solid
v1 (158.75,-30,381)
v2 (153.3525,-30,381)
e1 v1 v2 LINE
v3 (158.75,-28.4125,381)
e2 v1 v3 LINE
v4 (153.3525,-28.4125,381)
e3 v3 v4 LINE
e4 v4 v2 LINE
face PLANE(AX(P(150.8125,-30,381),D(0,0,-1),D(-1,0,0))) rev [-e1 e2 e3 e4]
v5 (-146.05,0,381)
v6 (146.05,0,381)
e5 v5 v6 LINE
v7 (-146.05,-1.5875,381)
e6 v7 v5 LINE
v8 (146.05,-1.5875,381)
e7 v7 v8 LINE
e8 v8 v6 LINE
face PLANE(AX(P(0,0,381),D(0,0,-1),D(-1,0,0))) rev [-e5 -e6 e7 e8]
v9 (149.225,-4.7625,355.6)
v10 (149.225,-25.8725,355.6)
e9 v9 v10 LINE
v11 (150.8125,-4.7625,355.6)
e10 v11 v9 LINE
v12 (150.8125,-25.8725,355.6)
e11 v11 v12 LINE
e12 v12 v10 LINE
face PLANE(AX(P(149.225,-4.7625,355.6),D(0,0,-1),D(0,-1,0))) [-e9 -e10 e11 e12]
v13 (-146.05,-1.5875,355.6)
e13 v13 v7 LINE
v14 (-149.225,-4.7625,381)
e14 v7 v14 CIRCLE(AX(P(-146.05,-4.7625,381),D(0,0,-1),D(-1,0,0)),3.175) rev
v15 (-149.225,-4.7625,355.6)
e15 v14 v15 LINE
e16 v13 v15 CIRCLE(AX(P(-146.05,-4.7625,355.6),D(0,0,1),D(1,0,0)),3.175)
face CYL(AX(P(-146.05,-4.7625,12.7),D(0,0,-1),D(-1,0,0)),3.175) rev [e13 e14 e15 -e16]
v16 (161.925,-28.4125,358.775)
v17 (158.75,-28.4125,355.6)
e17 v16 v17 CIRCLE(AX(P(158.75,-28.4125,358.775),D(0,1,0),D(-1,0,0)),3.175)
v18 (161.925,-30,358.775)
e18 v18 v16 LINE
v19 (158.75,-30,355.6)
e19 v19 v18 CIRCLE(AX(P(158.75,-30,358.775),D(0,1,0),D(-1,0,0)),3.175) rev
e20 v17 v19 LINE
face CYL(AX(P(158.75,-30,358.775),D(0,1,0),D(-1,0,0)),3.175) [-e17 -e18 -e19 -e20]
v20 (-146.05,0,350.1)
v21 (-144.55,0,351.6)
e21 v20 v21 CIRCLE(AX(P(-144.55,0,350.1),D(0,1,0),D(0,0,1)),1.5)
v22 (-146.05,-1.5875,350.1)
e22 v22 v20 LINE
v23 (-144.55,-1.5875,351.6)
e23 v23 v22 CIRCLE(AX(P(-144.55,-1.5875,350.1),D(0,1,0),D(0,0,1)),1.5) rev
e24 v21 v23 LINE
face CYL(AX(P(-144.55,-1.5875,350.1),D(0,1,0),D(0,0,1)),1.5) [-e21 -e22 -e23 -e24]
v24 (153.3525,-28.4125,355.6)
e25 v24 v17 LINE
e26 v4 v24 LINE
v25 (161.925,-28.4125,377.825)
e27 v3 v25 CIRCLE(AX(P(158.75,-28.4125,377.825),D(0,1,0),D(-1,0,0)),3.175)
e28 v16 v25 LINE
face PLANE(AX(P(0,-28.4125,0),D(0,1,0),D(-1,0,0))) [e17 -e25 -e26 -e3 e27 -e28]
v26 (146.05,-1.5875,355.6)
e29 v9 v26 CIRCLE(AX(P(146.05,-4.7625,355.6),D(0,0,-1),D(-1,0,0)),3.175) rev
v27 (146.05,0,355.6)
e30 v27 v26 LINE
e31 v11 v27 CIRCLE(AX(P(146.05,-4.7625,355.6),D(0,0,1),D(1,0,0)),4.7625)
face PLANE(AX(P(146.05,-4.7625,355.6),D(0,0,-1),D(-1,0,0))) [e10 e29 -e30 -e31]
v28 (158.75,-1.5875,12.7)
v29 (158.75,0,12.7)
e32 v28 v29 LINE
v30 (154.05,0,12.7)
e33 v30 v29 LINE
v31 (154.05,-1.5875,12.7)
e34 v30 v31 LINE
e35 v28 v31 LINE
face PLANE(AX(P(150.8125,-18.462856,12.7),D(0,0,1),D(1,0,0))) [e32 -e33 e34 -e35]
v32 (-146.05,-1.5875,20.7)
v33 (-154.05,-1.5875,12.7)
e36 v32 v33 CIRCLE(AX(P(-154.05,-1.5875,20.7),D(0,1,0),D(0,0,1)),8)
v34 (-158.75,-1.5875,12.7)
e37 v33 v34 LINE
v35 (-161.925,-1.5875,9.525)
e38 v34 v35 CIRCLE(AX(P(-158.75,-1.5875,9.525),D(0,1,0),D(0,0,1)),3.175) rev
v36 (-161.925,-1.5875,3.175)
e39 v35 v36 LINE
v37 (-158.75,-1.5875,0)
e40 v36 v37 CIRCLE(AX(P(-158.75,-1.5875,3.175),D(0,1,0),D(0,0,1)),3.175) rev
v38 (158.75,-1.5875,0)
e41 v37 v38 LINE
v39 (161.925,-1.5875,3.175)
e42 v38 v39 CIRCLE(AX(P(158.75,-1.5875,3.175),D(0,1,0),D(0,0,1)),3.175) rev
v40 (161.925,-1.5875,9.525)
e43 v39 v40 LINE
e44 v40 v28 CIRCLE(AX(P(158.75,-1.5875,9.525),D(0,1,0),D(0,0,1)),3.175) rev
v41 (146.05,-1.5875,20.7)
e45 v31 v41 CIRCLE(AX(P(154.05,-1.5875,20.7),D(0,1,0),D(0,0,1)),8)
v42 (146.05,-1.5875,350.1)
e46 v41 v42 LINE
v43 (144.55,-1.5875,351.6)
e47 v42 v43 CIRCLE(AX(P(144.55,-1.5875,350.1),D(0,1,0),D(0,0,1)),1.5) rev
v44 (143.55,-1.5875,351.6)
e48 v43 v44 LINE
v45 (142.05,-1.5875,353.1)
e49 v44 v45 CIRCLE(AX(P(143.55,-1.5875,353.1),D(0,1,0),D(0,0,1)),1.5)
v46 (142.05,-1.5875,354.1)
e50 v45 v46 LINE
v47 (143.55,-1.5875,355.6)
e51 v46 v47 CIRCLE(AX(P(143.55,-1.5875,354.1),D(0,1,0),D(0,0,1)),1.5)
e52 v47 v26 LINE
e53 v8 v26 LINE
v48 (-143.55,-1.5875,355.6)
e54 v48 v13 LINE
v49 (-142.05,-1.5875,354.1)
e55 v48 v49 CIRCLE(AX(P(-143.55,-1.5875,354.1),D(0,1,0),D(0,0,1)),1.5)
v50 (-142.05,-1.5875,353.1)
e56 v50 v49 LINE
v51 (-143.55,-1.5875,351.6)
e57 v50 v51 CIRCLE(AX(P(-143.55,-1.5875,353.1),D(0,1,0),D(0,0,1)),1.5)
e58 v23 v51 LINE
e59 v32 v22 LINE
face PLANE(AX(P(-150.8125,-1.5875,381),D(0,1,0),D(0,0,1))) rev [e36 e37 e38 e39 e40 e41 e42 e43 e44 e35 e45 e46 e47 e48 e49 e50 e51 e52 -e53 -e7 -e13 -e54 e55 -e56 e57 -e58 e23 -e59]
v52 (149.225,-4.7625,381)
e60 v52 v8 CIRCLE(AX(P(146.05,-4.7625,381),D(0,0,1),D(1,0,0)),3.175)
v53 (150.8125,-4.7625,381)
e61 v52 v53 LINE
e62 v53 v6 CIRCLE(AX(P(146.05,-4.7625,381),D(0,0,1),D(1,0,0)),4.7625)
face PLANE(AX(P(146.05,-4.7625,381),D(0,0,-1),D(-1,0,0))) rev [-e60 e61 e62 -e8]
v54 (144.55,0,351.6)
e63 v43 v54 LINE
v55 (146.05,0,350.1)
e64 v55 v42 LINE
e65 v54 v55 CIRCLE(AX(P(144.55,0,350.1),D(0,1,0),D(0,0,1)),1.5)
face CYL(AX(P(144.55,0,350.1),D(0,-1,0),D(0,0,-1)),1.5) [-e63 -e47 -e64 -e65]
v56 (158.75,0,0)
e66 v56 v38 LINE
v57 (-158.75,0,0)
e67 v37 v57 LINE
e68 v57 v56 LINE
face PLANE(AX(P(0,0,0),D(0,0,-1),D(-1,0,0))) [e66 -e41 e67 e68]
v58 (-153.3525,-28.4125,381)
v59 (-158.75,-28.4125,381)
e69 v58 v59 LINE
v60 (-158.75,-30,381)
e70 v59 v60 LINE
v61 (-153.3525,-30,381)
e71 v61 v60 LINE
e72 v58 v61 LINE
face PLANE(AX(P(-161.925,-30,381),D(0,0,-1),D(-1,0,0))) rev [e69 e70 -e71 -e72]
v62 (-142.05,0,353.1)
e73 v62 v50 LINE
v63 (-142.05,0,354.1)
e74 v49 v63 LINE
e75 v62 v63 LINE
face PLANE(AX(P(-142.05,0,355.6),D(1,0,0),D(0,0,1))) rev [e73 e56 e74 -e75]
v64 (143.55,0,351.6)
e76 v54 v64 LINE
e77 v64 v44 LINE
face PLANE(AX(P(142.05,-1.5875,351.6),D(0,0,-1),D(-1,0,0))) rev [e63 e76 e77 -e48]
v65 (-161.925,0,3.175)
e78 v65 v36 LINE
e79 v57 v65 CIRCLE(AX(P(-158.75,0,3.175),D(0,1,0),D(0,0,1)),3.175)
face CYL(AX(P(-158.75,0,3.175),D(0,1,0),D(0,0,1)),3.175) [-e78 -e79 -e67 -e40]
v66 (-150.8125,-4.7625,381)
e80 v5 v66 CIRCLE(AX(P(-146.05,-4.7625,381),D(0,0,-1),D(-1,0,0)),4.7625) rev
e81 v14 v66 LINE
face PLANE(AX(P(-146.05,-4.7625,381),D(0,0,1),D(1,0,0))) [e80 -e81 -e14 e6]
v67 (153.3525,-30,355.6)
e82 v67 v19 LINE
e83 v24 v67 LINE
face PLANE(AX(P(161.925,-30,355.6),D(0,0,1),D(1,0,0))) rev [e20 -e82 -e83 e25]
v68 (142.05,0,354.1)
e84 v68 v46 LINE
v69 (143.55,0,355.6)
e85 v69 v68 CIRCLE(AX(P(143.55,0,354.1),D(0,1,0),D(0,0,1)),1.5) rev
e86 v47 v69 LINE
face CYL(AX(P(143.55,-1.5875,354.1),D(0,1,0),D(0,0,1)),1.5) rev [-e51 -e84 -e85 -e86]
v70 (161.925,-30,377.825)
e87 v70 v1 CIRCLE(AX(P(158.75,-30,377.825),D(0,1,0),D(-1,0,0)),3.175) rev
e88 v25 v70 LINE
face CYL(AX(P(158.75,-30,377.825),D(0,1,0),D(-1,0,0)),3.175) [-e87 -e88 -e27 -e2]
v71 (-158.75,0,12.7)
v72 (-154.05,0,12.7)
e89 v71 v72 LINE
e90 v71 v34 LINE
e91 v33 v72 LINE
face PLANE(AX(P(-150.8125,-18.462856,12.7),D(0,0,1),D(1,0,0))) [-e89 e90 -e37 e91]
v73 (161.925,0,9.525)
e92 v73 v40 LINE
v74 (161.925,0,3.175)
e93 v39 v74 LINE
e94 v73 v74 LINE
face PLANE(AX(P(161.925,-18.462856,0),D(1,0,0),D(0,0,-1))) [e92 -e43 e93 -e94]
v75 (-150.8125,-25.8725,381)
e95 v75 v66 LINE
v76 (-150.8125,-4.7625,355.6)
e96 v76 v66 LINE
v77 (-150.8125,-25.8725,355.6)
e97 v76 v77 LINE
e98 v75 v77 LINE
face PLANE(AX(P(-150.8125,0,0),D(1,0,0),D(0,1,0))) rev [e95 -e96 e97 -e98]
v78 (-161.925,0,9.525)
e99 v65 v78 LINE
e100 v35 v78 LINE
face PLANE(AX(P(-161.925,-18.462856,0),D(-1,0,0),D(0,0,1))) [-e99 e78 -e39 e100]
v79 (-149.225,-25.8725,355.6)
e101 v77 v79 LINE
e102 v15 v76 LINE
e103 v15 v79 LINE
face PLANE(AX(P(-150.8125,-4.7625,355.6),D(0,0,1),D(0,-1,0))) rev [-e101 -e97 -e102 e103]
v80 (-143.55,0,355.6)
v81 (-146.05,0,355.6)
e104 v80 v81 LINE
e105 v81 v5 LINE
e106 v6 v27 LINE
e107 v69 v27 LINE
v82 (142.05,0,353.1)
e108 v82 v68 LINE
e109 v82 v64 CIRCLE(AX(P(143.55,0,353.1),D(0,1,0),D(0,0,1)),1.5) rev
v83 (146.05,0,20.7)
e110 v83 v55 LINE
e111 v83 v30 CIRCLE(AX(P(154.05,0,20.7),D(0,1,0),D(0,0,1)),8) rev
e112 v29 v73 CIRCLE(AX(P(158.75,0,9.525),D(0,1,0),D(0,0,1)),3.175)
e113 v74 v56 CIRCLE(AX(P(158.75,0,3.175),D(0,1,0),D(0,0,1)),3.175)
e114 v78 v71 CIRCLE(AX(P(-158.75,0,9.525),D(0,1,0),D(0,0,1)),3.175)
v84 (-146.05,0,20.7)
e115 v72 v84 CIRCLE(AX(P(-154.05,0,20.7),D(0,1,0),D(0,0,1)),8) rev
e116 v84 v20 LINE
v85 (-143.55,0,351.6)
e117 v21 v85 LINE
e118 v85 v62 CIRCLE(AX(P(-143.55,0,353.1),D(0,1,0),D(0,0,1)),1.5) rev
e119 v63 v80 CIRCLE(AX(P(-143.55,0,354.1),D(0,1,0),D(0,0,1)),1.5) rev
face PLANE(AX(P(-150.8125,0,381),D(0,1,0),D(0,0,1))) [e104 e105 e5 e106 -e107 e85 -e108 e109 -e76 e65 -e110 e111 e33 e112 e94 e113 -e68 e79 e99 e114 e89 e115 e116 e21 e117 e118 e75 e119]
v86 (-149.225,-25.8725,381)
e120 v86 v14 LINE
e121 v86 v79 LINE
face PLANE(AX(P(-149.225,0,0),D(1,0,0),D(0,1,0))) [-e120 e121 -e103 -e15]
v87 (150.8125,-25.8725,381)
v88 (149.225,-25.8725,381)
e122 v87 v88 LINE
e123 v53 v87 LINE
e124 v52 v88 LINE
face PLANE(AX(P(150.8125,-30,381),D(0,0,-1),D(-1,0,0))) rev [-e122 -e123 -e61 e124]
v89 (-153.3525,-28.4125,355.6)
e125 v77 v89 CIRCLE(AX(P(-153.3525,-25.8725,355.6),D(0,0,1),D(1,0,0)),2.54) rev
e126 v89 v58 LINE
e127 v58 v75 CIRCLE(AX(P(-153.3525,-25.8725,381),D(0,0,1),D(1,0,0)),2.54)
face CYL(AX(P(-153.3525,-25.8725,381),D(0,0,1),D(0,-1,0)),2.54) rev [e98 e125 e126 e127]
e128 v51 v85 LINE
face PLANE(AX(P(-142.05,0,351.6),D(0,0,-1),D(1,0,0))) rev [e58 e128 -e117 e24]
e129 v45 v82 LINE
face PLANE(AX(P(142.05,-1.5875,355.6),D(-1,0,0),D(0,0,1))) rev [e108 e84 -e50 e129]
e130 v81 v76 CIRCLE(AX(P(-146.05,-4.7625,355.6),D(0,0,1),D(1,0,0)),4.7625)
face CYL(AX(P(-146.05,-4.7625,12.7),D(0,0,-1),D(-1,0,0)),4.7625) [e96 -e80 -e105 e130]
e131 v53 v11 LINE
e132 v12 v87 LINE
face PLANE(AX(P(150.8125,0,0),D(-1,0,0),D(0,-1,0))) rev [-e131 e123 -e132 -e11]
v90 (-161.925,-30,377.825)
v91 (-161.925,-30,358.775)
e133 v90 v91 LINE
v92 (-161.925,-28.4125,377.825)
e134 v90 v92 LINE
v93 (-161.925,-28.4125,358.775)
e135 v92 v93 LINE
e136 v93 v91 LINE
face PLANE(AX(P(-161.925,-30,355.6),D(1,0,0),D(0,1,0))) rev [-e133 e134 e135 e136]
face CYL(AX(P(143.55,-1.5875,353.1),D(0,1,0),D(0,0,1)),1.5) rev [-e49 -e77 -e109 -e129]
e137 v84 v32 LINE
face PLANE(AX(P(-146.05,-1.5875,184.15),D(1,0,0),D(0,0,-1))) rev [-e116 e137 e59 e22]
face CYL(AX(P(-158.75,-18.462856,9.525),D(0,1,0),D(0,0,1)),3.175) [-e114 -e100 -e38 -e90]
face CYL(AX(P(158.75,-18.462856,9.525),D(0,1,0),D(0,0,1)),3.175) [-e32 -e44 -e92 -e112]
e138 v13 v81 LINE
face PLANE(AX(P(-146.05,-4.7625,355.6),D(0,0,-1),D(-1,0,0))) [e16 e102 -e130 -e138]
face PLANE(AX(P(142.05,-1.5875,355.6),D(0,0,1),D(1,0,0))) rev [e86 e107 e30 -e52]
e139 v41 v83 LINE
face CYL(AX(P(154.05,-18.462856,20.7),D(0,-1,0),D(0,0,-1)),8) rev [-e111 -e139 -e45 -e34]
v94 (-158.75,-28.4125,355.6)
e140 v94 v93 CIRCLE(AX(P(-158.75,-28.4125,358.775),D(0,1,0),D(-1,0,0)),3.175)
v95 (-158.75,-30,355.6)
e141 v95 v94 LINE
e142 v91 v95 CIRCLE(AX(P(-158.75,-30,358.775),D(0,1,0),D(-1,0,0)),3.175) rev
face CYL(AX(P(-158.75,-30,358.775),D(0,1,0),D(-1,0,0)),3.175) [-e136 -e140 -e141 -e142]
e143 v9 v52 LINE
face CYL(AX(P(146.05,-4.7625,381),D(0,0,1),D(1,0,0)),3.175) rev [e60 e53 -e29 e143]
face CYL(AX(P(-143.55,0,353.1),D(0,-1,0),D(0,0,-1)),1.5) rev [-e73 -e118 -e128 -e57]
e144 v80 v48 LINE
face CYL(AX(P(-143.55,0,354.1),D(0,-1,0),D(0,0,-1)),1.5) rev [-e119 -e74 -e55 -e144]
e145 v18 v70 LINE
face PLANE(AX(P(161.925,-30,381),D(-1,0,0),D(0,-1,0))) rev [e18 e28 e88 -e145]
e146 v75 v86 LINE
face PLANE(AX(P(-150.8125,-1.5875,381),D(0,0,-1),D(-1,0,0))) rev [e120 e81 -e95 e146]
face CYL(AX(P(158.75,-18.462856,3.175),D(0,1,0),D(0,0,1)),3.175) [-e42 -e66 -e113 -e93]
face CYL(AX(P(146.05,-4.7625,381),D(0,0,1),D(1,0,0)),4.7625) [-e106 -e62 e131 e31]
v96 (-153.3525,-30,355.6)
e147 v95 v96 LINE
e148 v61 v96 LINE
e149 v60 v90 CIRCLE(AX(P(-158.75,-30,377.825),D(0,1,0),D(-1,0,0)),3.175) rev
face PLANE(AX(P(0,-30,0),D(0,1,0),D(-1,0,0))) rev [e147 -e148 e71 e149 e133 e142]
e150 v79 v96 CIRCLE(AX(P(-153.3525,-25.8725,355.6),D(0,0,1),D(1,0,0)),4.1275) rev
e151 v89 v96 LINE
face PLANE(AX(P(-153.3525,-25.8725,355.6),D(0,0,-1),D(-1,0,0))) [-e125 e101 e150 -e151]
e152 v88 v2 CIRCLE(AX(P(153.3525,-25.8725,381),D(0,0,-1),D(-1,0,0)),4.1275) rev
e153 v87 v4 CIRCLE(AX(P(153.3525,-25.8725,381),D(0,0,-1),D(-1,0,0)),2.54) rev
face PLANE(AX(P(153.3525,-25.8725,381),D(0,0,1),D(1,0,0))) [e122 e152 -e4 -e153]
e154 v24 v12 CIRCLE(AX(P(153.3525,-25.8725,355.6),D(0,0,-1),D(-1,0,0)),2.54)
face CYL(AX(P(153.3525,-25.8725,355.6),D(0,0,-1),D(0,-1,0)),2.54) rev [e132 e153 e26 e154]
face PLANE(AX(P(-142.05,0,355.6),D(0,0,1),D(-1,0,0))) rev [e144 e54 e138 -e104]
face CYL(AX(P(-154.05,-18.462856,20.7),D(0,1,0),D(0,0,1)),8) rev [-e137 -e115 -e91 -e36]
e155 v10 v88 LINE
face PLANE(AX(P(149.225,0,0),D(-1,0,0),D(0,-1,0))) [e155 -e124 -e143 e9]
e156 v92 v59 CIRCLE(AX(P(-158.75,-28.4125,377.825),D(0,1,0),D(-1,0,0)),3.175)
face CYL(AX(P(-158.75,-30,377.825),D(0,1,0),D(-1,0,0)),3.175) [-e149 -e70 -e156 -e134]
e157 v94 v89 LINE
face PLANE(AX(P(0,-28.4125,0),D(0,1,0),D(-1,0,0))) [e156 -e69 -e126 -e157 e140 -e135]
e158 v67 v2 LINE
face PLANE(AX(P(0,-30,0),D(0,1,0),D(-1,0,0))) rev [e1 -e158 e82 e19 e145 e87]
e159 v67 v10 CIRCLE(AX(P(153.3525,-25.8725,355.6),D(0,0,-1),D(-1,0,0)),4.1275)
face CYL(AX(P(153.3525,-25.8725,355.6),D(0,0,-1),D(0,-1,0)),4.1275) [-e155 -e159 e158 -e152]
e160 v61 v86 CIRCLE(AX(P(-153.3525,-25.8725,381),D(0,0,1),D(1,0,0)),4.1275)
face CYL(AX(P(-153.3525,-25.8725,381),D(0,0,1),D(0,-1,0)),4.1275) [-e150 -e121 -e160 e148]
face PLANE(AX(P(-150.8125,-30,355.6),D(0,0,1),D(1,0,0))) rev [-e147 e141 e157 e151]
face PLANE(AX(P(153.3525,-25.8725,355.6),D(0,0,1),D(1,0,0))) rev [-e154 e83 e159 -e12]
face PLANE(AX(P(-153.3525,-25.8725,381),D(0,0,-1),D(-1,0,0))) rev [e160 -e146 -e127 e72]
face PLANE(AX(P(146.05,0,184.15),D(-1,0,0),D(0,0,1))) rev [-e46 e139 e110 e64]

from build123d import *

# Parameters (mm, degrees)
SKETCH5_W                      = 301.625
SKETCH5_H                      = 1.5875
BASE_FLANGE1_DEPTH             = 381
SKETCH10_W                     = 11.1125
SKETCH10_H                     = 12.7
BOSS_EXTRUDE1_DEPTH            = 1.5875
EDGE_FLANGE1_STRIP_W           = 12.7
EDGE_FLANGE1_STRIP_H           = 1.5875
EDGE_FLANGE1_STRIP_CUT_DEPTH   = 368.3
EDGE_FLANGE1_STRIP_2_W         = 12.7
EDGE_FLANGE1_STRIP_2_H         = 1.5875
EDGE_FLANGE1_STRIP_CUT_2_DEPTH = 368.3
EDGE_FLANGE1_DEPTH             = 368.3
EDGE_FLANGE1_BEND_DEPTH        = 368.3
CUT_EXTRUDE1_START             = -25.4
CUT_EXTRUDE1_DEPTH             = 342.9
EDGE_FLANGE2_STRIP_W           = 11.43
EDGE_FLANGE2_STRIP_H           = 1.5875
EDGE_FLANGE2_STRIP_CUT_DEPTH   = 25.4
EDGE_FLANGE2_DEPTH             = 25.4
EDGE_FLANGE3_STRIP_W           = 11.43
EDGE_FLANGE3_STRIP_H           = 1.5875
EDGE_FLANGE3_STRIP_CUT_DEPTH   = 25.4
EDGE_FLANGE3_DEPTH             = 25.4
FILLET1_R                      = 8
FILLET2_R                      = 3.175
SKETCH30_W                     = 4
SKETCH30_H                     = 1.5875
CUT_EXTRUDE9_DEPTH             = 4
SKETCH31_W                     = 4
SKETCH31_H                     = 1.5875
CUT_EXTRUDE10_DEPTH            = 4
FILLET4_R                      = 1.5


# Sheet-metal steps are written as plain solids
with BuildPart() as part:
    # Sketch5 → Base-Flange1 (new body)
    with BuildSketch(Plane.XY):
        with Locations((0, -0.79375)):
            Rectangle(SKETCH5_W, SKETCH5_H)
    extrude(amount=BASE_FLANGE1_DEPTH)

    # Sketch10 → Boss-Extrude1 (add)
    with BuildSketch(Plane(origin=(0, 0, 0), x_dir=(1, 0, 0), z_dir=(0, 1, 0))):
        with Locations((-156.36875, -6.35)):
            Rectangle(SKETCH10_W, SKETCH10_H)
        with Locations((156.36875, -6.35)):
            Rectangle(SKETCH10_W, SKETCH10_H)
    extrude(amount=-BOSS_EXTRUDE1_DEPTH)

    # Edge-Flange1 strip (across the edge) → Edge-Flange1 strip cut (cut)
    with BuildSketch(Plane(origin=(150.8125, -1.5875, 12.7), x_dir=(-1, 0, 0), z_dir=(0, 0, 1))):
        with Locations((-1.5875, -0.79375)):
            Rectangle(EDGE_FLANGE1_STRIP_W, EDGE_FLANGE1_STRIP_H)
    extrude(amount=EDGE_FLANGE1_STRIP_CUT_DEPTH, mode=Mode.SUBTRACT)

    # Edge-Flange1 strip 2 (across the edge) → Edge-Flange1 strip cut 2 (cut)
    with BuildSketch(Plane(origin=(-150.8125, -1.5875, 381), x_dir=(1, 0, 0), z_dir=(0, 0, -1))):
        with Locations((-1.5875, -0.79375)):
            Rectangle(EDGE_FLANGE1_STRIP_2_W, EDGE_FLANGE1_STRIP_2_H)
    extrude(amount=EDGE_FLANGE1_STRIP_CUT_2_DEPTH, mode=Mode.SUBTRACT)

    # Edge-Flange1 section (across the edge) → Edge-Flange1 (add)
    with BuildSketch(Plane(origin=(150.8125, -1.5875, 12.7), x_dir=(-1, 0, 0), z_dir=(0, 0, 1))):
        with BuildLine():
            Line((0, 3.175), (0, 28.4125))
            Line((0, 28.4125), (1.5875, 28.4125))
            Line((1.5875, 28.4125), (1.5875, 3.175))
            ThreePointArc((1.5875, 3.175), (2.51743597, 0.92993597), (4.7625, 0))
            Line((4.7625, 0), (4.7625, -1.5875))
            ThreePointArc((4.7625, -1.5875), (1.394903955, -0.192596045), (0, 3.175))
        make_face()
    extrude(amount=EDGE_FLANGE1_DEPTH)

    # Edge-Flange1 section 2 (across the edge) → Edge-Flange1 bend (add)
    with BuildSketch(Plane(origin=(-150.8125, -1.5875, 381), x_dir=(1, 0, 0), z_dir=(0, 0, -1))):
        with BuildLine():
            Line((0, 3.175), (0, 28.4125))
            Line((0, 28.4125), (1.5875, 28.4125))
            Line((1.5875, 28.4125), (1.5875, 3.175))
            ThreePointArc((1.5875, 3.175), (2.51743597, 0.92993597), (4.7625, 0))
            Line((4.7625, 0), (4.7625, -1.5875))
            ThreePointArc((4.7625, -1.5875), (1.394903955, -0.192596045), (0, 3.175))
        make_face()
    extrude(amount=EDGE_FLANGE1_BEND_DEPTH)

    # Sketch20 → Cut-Extrude1 (cut)
    with BuildSketch(Plane.XY.offset(381).offset(CUT_EXTRUDE1_START)):
        with BuildLine():
            Line((-150.8125, -4.7625), (-150.8125, -30))
            Line((-150.8125, -30), (-149.225, -30))
            Line((-149.225, -30), (-149.225, -4.7625))
            ThreePointArc((-149.225, -4.7625), (-148.29506403, -2.51743597), (-146.05, -1.5875))
            Line((-146.05, -1.5875), (-146.05, 0))
            ThreePointArc((-146.05, 0), (-149.417596045, -1.394903955), (-150.8125, -4.7625))
        make_face()
        with BuildLine():
            Line((149.225, -4.7625), (149.225, -30))
            Line((149.225, -30), (150.8125, -30))
            Line((150.8125, -30), (150.8125, -4.7625))
            ThreePointArc((150.8125, -4.7625), (149.417596045, -1.394903955), (146.05, 0))
            Line((146.05, 0), (146.05, -1.5875))
            ThreePointArc((146.05, -1.5875), (148.29506403, -2.51743597), (149.225, -4.7625))
        make_face()
    extrude(amount=-CUT_EXTRUDE1_DEPTH, mode=Mode.SUBTRACT)

    # Edge-Flange2 strip (across the edge) → Edge-Flange2 strip cut (cut)
    with BuildSketch(Plane(origin=(-150.8125, -30, 355.6), x_dir=(0, 1, 0), z_dir=(0, 0, 1))):
        with Locations((-1.5875, -0.79375)):
            Rectangle(EDGE_FLANGE2_STRIP_W, EDGE_FLANGE2_STRIP_H)
    extrude(amount=EDGE_FLANGE2_STRIP_CUT_DEPTH, mode=Mode.SUBTRACT)

    # Edge-Flange2 section (across the edge) → Edge-Flange2 (add)
    with BuildSketch(Plane(origin=(-150.8125, -30, 355.6), x_dir=(0, 1, 0), z_dir=(0, 0, 1))):
        with BuildLine():
            Line((0, 2.54), (0, 11.1125))
            Line((0, 11.1125), (1.5875, 11.1125))
            Line((1.5875, 11.1125), (1.5875, 2.54))
            ThreePointArc((1.5875, 2.54), (2.331448776, 0.743948776), (4.1275, 0))
            Line((4.1275, 0), (4.1275, -1.5875))
            ThreePointArc((4.1275, -1.5875), (1.208916761, -0.378583239), (0, 2.54))
        make_face()
    extrude(amount=EDGE_FLANGE2_DEPTH)

    # Edge-Flange3 strip (across the edge) → Edge-Flange3 strip cut (cut)
    with BuildSketch(Plane(origin=(150.8125, -30, 381), x_dir=(0, 1, 0), z_dir=(0, 0, -1))):
        with Locations((-1.5875, -0.79375)):
            Rectangle(EDGE_FLANGE3_STRIP_W, EDGE_FLANGE3_STRIP_H)
    extrude(amount=EDGE_FLANGE3_STRIP_CUT_DEPTH, mode=Mode.SUBTRACT)

    # Edge-Flange3 section (across the edge) → Edge-Flange3 (add)
    with BuildSketch(Plane(origin=(150.8125, -30, 381), x_dir=(0, 1, 0), z_dir=(0, 0, -1))):
        with BuildLine():
            Line((0, 2.54), (0, 11.1125))
            Line((0, 11.1125), (1.5875, 11.1125))
            Line((1.5875, 11.1125), (1.5875, 2.54))
            ThreePointArc((1.5875, 2.54), (2.331448776, 0.743948776), (4.1275, 0))
            Line((4.1275, 0), (4.1275, -1.5875))
            ThreePointArc((4.1275, -1.5875), (1.208916761, -0.378583239), (0, 2.54))
        make_face()
    extrude(amount=EDGE_FLANGE3_DEPTH)

    # Fillet1
    fillet1_edges = [part.edges().sort_by_distance(p)[0] for p in [
        (-146.05, -0.79375, 12.7),
        (146.05, -0.79375, 12.7),
    ]]
    fillet(fillet1_edges, radius=FILLET1_R)

    # Fillet2
    fillet2_edges = [part.edges().sort_by_distance(p)[0] for p in [
        (-161.925, -0.79375, 12.7),
        (-161.925, -0.79375, 0),
        (-161.925, -29.20625, 355.6),
        (-161.925, -29.20625, 381),
        (161.925, -29.20625, 381),
        (161.925, -29.20625, 355.6),
        (161.925, -0.79375, 0),
        (161.925, -0.79375, 12.7),
    ]]
    fillet(fillet2_edges, radius=FILLET2_R)

    # Sketch30 → Cut-Extrude9 (cut)
    with BuildSketch(Plane.ZY.offset(146.05)):
        with Locations((353.6, -0.79375)):
            Rectangle(SKETCH30_W, SKETCH30_H)
    extrude(amount=-CUT_EXTRUDE9_DEPTH, mode=Mode.SUBTRACT)

    # Sketch31 → Cut-Extrude10 (cut)
    with BuildSketch(Plane(origin=(146.05, 0, 0), x_dir=(0, 0, -1), z_dir=(1, 0, 0))):
        with Locations((-353.6, -0.79375)):
            Rectangle(SKETCH31_W, SKETCH31_H)
    extrude(amount=-CUT_EXTRUDE10_DEPTH, mode=Mode.SUBTRACT)

    # Fillet4
    fillet4_edges = [part.edges().sort_by_distance(p)[0] for p in [
        (-146.05, -0.79375, 351.6),
        (-142.05, -0.79375, 351.6),
        (-142.05, -0.79375, 355.6),
        (146.05, -0.79375, 351.6),
        (142.05, -0.79375, 351.6),
        (142.05, -0.79375, 355.6),
    ]]
    fillet(fillet4_edges, radius=FILLET4_R)


solid = part.part
